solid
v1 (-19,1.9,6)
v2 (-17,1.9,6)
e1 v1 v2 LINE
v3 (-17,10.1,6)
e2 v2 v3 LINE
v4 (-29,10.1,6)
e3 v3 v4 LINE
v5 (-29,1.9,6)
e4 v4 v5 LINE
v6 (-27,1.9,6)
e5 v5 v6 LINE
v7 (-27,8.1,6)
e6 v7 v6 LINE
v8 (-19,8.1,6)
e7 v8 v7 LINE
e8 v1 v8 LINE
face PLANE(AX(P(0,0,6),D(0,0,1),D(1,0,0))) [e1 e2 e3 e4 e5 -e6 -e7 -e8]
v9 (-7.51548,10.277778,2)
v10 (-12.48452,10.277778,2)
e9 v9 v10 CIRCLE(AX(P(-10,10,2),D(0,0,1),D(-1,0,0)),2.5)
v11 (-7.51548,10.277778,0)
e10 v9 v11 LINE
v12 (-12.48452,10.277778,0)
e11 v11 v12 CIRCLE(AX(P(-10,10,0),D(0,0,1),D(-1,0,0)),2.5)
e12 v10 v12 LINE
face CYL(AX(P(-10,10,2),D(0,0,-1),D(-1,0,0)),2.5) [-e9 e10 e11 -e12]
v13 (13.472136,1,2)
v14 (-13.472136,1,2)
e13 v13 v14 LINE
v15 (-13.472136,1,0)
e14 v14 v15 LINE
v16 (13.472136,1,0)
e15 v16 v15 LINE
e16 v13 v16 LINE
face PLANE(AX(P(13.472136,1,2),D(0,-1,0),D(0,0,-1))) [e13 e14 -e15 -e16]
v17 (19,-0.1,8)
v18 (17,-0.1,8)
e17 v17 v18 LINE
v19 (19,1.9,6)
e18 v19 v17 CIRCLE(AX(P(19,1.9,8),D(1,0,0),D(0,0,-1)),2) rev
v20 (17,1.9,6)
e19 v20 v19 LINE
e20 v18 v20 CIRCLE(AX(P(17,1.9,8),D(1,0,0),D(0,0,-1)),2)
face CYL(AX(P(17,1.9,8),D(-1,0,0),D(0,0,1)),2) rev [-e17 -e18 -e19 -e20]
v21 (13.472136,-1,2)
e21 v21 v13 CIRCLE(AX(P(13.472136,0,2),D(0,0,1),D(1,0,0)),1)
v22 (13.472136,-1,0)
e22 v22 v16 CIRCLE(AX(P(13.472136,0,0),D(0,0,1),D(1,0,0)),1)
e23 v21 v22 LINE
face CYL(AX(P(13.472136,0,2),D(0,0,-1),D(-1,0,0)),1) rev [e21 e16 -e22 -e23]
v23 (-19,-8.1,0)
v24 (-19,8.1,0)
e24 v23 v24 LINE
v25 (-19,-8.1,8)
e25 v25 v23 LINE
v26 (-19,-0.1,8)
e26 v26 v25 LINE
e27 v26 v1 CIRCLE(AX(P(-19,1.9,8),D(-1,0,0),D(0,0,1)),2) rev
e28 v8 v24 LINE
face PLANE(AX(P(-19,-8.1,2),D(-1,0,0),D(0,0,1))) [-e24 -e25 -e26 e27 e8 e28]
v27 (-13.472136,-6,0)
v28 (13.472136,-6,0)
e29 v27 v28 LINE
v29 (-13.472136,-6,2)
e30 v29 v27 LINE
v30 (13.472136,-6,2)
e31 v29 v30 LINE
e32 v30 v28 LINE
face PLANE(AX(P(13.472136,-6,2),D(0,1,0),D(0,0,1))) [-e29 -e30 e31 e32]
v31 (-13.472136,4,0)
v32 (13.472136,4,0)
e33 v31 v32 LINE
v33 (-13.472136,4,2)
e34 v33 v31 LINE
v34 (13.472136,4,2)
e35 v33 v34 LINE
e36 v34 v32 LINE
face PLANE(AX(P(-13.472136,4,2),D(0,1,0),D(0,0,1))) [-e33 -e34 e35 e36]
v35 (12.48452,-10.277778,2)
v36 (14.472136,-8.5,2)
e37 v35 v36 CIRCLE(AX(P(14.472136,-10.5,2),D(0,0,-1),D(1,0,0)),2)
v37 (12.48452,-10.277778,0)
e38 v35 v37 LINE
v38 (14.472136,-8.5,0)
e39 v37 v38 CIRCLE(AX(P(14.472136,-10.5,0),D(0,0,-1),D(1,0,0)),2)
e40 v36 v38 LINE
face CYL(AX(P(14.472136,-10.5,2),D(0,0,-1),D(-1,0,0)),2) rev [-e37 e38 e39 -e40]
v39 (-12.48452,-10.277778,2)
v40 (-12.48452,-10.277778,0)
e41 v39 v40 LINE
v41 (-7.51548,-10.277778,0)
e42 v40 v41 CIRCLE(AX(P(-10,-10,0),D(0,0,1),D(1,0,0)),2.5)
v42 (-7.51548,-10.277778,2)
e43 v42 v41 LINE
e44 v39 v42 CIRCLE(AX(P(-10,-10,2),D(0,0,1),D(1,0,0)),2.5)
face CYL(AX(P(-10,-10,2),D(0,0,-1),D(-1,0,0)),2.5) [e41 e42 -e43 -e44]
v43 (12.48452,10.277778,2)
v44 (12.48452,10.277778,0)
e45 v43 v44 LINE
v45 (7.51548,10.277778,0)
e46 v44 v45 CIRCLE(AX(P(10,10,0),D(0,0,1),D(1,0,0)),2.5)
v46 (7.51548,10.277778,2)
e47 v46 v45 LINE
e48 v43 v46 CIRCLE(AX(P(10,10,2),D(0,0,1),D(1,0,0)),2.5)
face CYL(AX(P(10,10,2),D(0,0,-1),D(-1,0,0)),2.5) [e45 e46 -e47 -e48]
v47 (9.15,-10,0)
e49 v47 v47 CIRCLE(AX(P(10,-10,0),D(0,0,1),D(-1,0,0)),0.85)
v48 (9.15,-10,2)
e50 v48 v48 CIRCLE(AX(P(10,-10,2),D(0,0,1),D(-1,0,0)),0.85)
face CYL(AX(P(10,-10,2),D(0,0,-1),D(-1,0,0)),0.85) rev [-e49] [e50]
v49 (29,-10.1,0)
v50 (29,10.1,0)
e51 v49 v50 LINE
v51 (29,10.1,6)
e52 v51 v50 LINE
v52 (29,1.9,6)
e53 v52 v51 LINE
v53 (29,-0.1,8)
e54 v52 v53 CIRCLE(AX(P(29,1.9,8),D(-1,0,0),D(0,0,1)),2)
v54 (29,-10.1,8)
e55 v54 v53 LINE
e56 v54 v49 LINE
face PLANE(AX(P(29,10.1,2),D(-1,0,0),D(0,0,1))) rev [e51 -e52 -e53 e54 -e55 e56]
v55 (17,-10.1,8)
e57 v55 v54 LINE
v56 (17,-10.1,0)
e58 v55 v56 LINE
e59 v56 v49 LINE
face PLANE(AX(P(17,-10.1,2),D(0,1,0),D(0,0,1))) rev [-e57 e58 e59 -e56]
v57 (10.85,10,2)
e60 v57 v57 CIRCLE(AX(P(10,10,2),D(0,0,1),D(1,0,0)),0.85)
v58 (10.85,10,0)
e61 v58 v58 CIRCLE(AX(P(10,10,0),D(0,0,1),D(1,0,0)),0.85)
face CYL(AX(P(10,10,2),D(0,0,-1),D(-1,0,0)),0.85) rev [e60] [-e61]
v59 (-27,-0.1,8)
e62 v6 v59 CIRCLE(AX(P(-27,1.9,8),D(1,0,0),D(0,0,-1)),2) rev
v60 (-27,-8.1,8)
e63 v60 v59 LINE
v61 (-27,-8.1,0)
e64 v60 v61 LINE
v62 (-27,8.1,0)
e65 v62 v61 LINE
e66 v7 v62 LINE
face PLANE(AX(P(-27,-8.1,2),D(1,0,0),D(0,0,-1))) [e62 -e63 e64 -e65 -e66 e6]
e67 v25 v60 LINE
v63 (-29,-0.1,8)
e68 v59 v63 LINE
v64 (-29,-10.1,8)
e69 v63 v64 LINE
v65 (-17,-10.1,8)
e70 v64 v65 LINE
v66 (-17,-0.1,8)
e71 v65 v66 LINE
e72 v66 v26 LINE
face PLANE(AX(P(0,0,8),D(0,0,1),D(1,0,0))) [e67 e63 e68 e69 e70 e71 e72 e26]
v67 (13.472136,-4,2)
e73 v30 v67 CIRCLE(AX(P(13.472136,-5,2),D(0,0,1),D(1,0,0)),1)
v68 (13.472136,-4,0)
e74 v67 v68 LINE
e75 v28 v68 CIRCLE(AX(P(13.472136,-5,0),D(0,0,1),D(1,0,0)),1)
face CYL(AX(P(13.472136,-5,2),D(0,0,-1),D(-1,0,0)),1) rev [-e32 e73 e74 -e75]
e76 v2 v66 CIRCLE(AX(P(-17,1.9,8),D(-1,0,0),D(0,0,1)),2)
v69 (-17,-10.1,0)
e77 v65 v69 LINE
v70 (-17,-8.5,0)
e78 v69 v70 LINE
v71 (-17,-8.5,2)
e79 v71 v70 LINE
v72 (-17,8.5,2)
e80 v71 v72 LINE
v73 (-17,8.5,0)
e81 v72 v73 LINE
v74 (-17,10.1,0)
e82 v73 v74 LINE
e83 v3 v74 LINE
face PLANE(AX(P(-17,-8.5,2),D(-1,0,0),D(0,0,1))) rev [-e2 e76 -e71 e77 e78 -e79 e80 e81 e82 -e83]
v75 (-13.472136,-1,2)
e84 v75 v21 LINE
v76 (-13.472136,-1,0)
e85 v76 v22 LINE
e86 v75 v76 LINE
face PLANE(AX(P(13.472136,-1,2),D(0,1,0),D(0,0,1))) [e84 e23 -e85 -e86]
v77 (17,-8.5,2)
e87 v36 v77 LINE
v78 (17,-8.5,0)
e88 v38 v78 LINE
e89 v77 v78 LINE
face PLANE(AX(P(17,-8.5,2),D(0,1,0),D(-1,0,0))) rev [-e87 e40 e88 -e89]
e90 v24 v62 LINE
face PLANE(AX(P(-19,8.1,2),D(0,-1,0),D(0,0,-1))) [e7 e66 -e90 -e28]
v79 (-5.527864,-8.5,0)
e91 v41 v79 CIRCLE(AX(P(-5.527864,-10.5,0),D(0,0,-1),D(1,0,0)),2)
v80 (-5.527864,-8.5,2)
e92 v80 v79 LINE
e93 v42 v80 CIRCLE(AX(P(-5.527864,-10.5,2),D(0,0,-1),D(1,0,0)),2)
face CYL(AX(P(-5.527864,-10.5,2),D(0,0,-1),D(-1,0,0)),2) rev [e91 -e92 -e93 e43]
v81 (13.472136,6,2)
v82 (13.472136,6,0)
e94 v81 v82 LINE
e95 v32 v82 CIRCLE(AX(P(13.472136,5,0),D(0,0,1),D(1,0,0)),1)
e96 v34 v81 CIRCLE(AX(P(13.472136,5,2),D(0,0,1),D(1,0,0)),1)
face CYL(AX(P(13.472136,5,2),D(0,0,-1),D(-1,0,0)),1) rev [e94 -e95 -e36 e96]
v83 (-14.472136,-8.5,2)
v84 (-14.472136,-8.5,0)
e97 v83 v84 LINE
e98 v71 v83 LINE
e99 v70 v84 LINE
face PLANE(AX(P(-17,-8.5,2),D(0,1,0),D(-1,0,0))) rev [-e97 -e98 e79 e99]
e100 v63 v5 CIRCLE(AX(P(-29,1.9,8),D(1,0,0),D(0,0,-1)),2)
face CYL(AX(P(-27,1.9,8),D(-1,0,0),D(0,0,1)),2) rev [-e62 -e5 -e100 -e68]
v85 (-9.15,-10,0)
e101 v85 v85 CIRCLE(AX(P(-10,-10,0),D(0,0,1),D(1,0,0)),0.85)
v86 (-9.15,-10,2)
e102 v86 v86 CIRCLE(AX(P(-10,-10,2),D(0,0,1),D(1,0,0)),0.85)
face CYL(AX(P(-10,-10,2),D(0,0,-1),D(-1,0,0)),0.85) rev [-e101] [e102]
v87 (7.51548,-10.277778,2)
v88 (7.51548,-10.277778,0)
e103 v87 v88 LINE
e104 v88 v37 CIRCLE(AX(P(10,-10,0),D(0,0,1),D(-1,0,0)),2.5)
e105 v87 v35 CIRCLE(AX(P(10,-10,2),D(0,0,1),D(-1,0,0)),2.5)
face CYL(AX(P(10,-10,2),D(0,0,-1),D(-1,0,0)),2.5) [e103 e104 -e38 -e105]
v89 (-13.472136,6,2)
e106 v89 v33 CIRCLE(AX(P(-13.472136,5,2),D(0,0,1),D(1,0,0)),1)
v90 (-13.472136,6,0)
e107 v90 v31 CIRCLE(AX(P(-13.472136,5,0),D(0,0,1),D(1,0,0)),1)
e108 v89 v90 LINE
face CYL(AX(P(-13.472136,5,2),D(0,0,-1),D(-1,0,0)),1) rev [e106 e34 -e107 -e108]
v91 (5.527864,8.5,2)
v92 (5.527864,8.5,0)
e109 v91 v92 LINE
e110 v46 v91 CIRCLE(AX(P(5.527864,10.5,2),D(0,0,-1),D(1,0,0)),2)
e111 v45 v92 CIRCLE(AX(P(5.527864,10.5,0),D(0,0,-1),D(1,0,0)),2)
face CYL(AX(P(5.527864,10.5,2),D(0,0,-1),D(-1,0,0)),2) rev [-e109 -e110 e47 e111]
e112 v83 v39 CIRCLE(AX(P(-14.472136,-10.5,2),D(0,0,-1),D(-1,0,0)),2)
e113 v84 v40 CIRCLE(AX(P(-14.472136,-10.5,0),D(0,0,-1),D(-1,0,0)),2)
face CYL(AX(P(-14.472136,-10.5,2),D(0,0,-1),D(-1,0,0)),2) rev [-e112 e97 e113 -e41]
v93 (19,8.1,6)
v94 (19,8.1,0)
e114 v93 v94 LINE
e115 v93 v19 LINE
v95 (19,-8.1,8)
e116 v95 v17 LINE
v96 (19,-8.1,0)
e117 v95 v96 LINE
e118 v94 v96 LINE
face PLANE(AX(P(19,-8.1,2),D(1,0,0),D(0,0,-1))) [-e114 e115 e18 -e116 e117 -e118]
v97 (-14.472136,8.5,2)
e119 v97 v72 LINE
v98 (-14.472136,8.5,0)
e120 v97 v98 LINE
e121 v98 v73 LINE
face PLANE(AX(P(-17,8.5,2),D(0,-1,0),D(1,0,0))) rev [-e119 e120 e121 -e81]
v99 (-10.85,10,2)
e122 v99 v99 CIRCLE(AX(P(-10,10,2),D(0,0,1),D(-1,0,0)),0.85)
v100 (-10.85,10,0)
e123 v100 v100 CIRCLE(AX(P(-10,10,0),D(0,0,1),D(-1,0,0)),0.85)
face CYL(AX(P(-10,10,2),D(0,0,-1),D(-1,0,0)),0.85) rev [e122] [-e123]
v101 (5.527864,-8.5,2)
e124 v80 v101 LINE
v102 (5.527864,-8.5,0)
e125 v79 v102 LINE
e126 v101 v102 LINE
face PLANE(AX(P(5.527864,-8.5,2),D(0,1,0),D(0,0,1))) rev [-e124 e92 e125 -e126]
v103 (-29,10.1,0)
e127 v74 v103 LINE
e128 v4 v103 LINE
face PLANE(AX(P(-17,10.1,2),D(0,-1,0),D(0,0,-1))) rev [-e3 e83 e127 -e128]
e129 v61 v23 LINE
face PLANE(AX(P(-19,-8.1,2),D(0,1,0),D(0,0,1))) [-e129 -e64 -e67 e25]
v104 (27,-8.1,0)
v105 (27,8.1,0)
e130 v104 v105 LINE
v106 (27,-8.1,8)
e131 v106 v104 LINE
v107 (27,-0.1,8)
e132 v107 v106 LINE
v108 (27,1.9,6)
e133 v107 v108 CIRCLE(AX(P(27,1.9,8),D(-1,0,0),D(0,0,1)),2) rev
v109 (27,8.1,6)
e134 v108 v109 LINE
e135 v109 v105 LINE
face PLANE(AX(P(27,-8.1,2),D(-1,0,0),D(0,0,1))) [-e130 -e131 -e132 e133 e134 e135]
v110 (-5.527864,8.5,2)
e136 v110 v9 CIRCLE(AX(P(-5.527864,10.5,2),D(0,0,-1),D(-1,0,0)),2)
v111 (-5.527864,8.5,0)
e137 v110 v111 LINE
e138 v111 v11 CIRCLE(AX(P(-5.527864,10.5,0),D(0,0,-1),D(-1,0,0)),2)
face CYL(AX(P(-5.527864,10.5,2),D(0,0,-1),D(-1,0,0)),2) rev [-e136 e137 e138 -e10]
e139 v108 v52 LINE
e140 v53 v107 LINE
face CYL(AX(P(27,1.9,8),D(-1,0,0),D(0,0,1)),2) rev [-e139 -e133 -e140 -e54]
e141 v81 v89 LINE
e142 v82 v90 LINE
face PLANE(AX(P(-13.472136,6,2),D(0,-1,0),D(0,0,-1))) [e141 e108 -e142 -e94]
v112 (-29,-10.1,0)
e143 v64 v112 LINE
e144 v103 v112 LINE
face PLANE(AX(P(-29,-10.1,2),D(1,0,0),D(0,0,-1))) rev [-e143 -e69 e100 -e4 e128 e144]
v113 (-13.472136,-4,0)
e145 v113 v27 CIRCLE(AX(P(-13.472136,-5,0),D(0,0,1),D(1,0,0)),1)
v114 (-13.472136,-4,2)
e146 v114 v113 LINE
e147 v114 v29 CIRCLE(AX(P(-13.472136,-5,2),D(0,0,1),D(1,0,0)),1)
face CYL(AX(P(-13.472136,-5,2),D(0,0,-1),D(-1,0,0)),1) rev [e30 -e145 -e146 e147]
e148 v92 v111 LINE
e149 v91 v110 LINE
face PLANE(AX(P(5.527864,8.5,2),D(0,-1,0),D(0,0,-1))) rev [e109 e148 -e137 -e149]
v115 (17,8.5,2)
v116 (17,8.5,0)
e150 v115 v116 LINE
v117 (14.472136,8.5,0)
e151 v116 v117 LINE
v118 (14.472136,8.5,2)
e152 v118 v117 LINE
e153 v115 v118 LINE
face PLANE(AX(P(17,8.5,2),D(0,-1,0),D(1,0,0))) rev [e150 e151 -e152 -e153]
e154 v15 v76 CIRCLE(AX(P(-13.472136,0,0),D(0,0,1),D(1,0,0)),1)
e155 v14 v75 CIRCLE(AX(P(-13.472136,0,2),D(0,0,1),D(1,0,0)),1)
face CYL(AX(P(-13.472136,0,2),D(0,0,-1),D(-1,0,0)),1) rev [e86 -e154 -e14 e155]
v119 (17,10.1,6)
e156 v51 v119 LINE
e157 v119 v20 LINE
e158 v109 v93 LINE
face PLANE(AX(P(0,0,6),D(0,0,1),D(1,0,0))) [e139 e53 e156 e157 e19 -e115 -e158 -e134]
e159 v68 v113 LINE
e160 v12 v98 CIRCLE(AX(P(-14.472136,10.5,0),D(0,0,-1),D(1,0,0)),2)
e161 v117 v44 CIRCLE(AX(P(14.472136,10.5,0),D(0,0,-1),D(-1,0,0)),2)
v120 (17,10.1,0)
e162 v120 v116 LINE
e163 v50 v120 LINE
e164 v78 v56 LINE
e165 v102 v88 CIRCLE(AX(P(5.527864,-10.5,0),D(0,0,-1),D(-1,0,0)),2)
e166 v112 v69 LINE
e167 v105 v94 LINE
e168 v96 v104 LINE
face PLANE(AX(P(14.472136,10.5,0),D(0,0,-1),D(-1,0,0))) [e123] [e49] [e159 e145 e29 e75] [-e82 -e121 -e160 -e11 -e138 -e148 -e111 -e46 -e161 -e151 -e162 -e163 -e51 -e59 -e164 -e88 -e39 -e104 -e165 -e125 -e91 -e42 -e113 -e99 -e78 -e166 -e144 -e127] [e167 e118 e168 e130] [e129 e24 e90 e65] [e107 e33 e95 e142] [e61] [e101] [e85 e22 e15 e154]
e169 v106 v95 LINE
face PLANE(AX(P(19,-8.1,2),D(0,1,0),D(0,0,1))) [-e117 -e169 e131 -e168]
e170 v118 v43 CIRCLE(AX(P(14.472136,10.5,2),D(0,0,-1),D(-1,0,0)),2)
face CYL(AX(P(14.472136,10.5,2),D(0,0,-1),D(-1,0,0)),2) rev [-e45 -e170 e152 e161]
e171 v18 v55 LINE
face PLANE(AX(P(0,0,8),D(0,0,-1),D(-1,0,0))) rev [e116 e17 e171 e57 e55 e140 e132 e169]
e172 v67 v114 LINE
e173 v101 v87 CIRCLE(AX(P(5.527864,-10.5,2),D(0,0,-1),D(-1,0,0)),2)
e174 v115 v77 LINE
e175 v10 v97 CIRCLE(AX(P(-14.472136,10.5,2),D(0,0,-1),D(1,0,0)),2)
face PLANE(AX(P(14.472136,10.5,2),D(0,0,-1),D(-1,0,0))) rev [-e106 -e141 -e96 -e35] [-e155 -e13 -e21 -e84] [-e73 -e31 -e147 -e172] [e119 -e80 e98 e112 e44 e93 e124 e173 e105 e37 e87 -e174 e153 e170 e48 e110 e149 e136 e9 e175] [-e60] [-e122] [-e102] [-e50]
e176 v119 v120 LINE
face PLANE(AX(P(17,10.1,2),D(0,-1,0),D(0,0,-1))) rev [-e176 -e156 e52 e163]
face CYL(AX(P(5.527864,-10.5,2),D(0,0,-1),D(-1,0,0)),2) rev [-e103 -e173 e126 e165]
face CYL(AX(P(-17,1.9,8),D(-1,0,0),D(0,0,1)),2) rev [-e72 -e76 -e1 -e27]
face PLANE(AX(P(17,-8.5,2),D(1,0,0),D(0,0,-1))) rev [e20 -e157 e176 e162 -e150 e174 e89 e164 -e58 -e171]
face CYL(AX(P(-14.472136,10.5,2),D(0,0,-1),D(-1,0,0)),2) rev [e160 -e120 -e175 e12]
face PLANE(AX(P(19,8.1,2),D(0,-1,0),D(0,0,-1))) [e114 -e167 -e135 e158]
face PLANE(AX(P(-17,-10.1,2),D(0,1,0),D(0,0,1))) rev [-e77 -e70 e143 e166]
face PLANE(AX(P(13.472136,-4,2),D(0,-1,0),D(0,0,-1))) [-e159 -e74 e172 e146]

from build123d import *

# Parameters (mm, degrees)
SKETCH2_R           = 0.85
SKETCH2_W           = 8
SKETCH2_H           = 16.2
BOSS_EXTRUDE1_DEPTH = 2
SKETCH6_W           = 12
SKETCH6_H           = 20.2
SKETCH6_W_2         = 8
SKETCH6_H_2         = 16.2
BOSS_EXTRUDE5_DEPTH = 4
BOSS_EXTRUDE6_DEPTH = 2
FILLET1_R           = 2


with BuildPart() as part:
    # Sketch2 → Boss-Extrude1 (new body)
    with BuildSketch(Plane.XY):
        with BuildLine():
            Line((5.527864045, 8.5), (-5.527864045, 8.5))
            ThreePointArc((-5.527864045, 8.5), (-6.861197378, 9.009288015), (-7.515480025, 10.277777778))
            ThreePointArc((-7.515480025, 10.277777778), (-10, 12.5), (-12.484519975, 10.277777778))
            ThreePointArc((-12.484519975, 10.277777778), (-13.138802622, 9.009288015), (-14.472135955, 8.5))
            Line((-14.472135955, 8.5), (-17, 8.5))
            Line((-17, 8.5), (-17, 10.1))
            Line((-17, 10.1), (-29, 10.1))
            Line((-29, 10.1), (-29, 0))
            Line((-29, 0), (-29, -10.1))
            Line((-29, -10.1), (-17, -10.1))
            Line((-17, -10.1), (-17, -8.5))
            Line((-17, -8.5), (-14.472135955, -8.5))
            ThreePointArc((-14.472135955, -8.5), (-13.138802622, -9.009288015), (-12.484519975, -10.277777778))
            ThreePointArc((-12.484519975, -10.277777778), (-10, -12.5), (-7.515480025, -10.277777778))
            ThreePointArc((-7.515480025, -10.277777778), (-6.861197378, -9.009288015), (-5.527864045, -8.5))
            Line((-5.527864045, -8.5), (5.527864045, -8.5))
            ThreePointArc((5.527864045, -8.5), (6.861197378, -9.009288015), (7.515480025, -10.277777778))
            ThreePointArc((7.515480025, -10.277777778), (10, -12.5), (12.484519975, -10.277777778))
            ThreePointArc((12.484519975, -10.277777778), (13.138802622, -9.009288015), (14.472135955, -8.5))
            Line((14.472135955, -8.5), (17, -8.5))
            Line((17, -8.5), (17, -10.1))
            Line((17, -10.1), (29, -10.1))
            Line((29, -10.1), (29, 0))
            Line((29, 0), (29, 10.1))
            Line((29, 10.1), (17, 10.1))
            Line((17, 10.1), (17, 8.5))
            Line((17, 8.5), (14.472135955, 8.5))
            ThreePointArc((14.472135955, 8.5), (13.138802622, 9.009288015), (12.484519975, 10.277777778))
            ThreePointArc((12.484519975, 10.277777778), (10, 12.5), (7.515480025, 10.277777778))
            ThreePointArc((7.515480025, 10.277777778), (6.861197378, 9.009288015), (5.527864045, 8.5))
        make_face()
        with Locations((10, 10)):
            Circle(SKETCH2_R, mode=Mode.SUBTRACT)
        with Locations(Location((-10, 10, 0), (0, 0, 180))):
            Circle(SKETCH2_R, mode=Mode.SUBTRACT)
        with Locations((-10, -10)):
            Circle(SKETCH2_R, mode=Mode.SUBTRACT)
        with Locations(Location((10, -10, 0), (0, 0, 180))):
            Circle(SKETCH2_R, mode=Mode.SUBTRACT)
        with Locations((23, 0)):
            Rectangle(SKETCH2_W, SKETCH2_H, mode=Mode.SUBTRACT)
        with Locations((-23, 0)):
            Rectangle(SKETCH2_W, SKETCH2_H, mode=Mode.SUBTRACT)
        with BuildLine():
            Line((-13.472135955, 6), (13.472135955, 6))
            ThreePointArc((13.472135955, 6), (14.472135955, 5), (13.472135955, 4))
            Line((13.472135955, 4), (-13.472135955, 4))
            ThreePointArc((-13.472135955, 4), (-14.472135955, 5), (-13.472135955, 6))
        make_face(mode=Mode.SUBTRACT)
        with BuildLine():
            Line((13.472135955, -1), (-13.472135955, -1))
            ThreePointArc((-13.472135955, -1), (-14.472135955, 0), (-13.472135955, 1))
            Line((-13.472135955, 1), (13.472135955, 1))
            ThreePointArc((13.472135955, 1), (14.472135955, 0), (13.472135955, -1))
        make_face(mode=Mode.SUBTRACT)
        with BuildLine():
            Line((13.472135955, -6), (-13.472135955, -6))
            ThreePointArc((-13.472135955, -6), (-14.472135955, -5), (-13.472135955, -4))
            Line((-13.472135955, -4), (13.472135955, -4))
            ThreePointArc((13.472135955, -4), (14.472135955, -5), (13.472135955, -6))
        make_face(mode=Mode.SUBTRACT)
    extrude(amount=BOSS_EXTRUDE1_DEPTH)

    # Sketch6 → Boss-Extrude5 (add)
    # profile 1 of 2: a face of its own
    with BuildSketch(Plane.XY.offset(2)):
        with Locations((-23, 0)):
            Rectangle(SKETCH6_W, SKETCH6_H)
        with Locations((-23, 0)):
            Rectangle(SKETCH6_W_2, SKETCH6_H_2, mode=Mode.SUBTRACT)
    # profile 2 of 2: a face of its own
    with BuildSketch(Plane.XY.offset(2)):
        with Locations((23, 0)):
            Rectangle(SKETCH6_W, SKETCH6_H)
        with Locations((23, 0)):
            Rectangle(SKETCH6_W_2, SKETCH6_H_2, mode=Mode.SUBTRACT)
    extrude(amount=BOSS_EXTRUDE5_DEPTH)

    # Sketch7 → Boss-Extrude6 (add)
    with BuildSketch(Plane.XY.offset(6)):
        Polygon((17, -0.1), (19, -0.1), (19, -8.1), (27, -8.1), (27, -0.1), (29, -0.1), (29, -10.1), (17, -10.1), align=None)
        Polygon((-17, -10.1), (-17, -0.1), (-19, -0.1), (-19, -8.1), (-27, -8.1), (-27, -0.1), (-29, -0.1), (-29, -10.1), align=None)
    extrude(amount=BOSS_EXTRUDE6_DEPTH)

    # Fillet1
    fillet1_edges = [part.edges().sort_by_distance(p)[0] for p in [
        (28, -0.1, 6),
        (18, -0.1, 6),
        (-18, -0.1, 6),
        (-28, -0.1, 6),
    ]]
    fillet(fillet1_edges, radius=FILLET1_R - 0.0001)  # a hair under: the kernel refuses the full size


solid = part.part
